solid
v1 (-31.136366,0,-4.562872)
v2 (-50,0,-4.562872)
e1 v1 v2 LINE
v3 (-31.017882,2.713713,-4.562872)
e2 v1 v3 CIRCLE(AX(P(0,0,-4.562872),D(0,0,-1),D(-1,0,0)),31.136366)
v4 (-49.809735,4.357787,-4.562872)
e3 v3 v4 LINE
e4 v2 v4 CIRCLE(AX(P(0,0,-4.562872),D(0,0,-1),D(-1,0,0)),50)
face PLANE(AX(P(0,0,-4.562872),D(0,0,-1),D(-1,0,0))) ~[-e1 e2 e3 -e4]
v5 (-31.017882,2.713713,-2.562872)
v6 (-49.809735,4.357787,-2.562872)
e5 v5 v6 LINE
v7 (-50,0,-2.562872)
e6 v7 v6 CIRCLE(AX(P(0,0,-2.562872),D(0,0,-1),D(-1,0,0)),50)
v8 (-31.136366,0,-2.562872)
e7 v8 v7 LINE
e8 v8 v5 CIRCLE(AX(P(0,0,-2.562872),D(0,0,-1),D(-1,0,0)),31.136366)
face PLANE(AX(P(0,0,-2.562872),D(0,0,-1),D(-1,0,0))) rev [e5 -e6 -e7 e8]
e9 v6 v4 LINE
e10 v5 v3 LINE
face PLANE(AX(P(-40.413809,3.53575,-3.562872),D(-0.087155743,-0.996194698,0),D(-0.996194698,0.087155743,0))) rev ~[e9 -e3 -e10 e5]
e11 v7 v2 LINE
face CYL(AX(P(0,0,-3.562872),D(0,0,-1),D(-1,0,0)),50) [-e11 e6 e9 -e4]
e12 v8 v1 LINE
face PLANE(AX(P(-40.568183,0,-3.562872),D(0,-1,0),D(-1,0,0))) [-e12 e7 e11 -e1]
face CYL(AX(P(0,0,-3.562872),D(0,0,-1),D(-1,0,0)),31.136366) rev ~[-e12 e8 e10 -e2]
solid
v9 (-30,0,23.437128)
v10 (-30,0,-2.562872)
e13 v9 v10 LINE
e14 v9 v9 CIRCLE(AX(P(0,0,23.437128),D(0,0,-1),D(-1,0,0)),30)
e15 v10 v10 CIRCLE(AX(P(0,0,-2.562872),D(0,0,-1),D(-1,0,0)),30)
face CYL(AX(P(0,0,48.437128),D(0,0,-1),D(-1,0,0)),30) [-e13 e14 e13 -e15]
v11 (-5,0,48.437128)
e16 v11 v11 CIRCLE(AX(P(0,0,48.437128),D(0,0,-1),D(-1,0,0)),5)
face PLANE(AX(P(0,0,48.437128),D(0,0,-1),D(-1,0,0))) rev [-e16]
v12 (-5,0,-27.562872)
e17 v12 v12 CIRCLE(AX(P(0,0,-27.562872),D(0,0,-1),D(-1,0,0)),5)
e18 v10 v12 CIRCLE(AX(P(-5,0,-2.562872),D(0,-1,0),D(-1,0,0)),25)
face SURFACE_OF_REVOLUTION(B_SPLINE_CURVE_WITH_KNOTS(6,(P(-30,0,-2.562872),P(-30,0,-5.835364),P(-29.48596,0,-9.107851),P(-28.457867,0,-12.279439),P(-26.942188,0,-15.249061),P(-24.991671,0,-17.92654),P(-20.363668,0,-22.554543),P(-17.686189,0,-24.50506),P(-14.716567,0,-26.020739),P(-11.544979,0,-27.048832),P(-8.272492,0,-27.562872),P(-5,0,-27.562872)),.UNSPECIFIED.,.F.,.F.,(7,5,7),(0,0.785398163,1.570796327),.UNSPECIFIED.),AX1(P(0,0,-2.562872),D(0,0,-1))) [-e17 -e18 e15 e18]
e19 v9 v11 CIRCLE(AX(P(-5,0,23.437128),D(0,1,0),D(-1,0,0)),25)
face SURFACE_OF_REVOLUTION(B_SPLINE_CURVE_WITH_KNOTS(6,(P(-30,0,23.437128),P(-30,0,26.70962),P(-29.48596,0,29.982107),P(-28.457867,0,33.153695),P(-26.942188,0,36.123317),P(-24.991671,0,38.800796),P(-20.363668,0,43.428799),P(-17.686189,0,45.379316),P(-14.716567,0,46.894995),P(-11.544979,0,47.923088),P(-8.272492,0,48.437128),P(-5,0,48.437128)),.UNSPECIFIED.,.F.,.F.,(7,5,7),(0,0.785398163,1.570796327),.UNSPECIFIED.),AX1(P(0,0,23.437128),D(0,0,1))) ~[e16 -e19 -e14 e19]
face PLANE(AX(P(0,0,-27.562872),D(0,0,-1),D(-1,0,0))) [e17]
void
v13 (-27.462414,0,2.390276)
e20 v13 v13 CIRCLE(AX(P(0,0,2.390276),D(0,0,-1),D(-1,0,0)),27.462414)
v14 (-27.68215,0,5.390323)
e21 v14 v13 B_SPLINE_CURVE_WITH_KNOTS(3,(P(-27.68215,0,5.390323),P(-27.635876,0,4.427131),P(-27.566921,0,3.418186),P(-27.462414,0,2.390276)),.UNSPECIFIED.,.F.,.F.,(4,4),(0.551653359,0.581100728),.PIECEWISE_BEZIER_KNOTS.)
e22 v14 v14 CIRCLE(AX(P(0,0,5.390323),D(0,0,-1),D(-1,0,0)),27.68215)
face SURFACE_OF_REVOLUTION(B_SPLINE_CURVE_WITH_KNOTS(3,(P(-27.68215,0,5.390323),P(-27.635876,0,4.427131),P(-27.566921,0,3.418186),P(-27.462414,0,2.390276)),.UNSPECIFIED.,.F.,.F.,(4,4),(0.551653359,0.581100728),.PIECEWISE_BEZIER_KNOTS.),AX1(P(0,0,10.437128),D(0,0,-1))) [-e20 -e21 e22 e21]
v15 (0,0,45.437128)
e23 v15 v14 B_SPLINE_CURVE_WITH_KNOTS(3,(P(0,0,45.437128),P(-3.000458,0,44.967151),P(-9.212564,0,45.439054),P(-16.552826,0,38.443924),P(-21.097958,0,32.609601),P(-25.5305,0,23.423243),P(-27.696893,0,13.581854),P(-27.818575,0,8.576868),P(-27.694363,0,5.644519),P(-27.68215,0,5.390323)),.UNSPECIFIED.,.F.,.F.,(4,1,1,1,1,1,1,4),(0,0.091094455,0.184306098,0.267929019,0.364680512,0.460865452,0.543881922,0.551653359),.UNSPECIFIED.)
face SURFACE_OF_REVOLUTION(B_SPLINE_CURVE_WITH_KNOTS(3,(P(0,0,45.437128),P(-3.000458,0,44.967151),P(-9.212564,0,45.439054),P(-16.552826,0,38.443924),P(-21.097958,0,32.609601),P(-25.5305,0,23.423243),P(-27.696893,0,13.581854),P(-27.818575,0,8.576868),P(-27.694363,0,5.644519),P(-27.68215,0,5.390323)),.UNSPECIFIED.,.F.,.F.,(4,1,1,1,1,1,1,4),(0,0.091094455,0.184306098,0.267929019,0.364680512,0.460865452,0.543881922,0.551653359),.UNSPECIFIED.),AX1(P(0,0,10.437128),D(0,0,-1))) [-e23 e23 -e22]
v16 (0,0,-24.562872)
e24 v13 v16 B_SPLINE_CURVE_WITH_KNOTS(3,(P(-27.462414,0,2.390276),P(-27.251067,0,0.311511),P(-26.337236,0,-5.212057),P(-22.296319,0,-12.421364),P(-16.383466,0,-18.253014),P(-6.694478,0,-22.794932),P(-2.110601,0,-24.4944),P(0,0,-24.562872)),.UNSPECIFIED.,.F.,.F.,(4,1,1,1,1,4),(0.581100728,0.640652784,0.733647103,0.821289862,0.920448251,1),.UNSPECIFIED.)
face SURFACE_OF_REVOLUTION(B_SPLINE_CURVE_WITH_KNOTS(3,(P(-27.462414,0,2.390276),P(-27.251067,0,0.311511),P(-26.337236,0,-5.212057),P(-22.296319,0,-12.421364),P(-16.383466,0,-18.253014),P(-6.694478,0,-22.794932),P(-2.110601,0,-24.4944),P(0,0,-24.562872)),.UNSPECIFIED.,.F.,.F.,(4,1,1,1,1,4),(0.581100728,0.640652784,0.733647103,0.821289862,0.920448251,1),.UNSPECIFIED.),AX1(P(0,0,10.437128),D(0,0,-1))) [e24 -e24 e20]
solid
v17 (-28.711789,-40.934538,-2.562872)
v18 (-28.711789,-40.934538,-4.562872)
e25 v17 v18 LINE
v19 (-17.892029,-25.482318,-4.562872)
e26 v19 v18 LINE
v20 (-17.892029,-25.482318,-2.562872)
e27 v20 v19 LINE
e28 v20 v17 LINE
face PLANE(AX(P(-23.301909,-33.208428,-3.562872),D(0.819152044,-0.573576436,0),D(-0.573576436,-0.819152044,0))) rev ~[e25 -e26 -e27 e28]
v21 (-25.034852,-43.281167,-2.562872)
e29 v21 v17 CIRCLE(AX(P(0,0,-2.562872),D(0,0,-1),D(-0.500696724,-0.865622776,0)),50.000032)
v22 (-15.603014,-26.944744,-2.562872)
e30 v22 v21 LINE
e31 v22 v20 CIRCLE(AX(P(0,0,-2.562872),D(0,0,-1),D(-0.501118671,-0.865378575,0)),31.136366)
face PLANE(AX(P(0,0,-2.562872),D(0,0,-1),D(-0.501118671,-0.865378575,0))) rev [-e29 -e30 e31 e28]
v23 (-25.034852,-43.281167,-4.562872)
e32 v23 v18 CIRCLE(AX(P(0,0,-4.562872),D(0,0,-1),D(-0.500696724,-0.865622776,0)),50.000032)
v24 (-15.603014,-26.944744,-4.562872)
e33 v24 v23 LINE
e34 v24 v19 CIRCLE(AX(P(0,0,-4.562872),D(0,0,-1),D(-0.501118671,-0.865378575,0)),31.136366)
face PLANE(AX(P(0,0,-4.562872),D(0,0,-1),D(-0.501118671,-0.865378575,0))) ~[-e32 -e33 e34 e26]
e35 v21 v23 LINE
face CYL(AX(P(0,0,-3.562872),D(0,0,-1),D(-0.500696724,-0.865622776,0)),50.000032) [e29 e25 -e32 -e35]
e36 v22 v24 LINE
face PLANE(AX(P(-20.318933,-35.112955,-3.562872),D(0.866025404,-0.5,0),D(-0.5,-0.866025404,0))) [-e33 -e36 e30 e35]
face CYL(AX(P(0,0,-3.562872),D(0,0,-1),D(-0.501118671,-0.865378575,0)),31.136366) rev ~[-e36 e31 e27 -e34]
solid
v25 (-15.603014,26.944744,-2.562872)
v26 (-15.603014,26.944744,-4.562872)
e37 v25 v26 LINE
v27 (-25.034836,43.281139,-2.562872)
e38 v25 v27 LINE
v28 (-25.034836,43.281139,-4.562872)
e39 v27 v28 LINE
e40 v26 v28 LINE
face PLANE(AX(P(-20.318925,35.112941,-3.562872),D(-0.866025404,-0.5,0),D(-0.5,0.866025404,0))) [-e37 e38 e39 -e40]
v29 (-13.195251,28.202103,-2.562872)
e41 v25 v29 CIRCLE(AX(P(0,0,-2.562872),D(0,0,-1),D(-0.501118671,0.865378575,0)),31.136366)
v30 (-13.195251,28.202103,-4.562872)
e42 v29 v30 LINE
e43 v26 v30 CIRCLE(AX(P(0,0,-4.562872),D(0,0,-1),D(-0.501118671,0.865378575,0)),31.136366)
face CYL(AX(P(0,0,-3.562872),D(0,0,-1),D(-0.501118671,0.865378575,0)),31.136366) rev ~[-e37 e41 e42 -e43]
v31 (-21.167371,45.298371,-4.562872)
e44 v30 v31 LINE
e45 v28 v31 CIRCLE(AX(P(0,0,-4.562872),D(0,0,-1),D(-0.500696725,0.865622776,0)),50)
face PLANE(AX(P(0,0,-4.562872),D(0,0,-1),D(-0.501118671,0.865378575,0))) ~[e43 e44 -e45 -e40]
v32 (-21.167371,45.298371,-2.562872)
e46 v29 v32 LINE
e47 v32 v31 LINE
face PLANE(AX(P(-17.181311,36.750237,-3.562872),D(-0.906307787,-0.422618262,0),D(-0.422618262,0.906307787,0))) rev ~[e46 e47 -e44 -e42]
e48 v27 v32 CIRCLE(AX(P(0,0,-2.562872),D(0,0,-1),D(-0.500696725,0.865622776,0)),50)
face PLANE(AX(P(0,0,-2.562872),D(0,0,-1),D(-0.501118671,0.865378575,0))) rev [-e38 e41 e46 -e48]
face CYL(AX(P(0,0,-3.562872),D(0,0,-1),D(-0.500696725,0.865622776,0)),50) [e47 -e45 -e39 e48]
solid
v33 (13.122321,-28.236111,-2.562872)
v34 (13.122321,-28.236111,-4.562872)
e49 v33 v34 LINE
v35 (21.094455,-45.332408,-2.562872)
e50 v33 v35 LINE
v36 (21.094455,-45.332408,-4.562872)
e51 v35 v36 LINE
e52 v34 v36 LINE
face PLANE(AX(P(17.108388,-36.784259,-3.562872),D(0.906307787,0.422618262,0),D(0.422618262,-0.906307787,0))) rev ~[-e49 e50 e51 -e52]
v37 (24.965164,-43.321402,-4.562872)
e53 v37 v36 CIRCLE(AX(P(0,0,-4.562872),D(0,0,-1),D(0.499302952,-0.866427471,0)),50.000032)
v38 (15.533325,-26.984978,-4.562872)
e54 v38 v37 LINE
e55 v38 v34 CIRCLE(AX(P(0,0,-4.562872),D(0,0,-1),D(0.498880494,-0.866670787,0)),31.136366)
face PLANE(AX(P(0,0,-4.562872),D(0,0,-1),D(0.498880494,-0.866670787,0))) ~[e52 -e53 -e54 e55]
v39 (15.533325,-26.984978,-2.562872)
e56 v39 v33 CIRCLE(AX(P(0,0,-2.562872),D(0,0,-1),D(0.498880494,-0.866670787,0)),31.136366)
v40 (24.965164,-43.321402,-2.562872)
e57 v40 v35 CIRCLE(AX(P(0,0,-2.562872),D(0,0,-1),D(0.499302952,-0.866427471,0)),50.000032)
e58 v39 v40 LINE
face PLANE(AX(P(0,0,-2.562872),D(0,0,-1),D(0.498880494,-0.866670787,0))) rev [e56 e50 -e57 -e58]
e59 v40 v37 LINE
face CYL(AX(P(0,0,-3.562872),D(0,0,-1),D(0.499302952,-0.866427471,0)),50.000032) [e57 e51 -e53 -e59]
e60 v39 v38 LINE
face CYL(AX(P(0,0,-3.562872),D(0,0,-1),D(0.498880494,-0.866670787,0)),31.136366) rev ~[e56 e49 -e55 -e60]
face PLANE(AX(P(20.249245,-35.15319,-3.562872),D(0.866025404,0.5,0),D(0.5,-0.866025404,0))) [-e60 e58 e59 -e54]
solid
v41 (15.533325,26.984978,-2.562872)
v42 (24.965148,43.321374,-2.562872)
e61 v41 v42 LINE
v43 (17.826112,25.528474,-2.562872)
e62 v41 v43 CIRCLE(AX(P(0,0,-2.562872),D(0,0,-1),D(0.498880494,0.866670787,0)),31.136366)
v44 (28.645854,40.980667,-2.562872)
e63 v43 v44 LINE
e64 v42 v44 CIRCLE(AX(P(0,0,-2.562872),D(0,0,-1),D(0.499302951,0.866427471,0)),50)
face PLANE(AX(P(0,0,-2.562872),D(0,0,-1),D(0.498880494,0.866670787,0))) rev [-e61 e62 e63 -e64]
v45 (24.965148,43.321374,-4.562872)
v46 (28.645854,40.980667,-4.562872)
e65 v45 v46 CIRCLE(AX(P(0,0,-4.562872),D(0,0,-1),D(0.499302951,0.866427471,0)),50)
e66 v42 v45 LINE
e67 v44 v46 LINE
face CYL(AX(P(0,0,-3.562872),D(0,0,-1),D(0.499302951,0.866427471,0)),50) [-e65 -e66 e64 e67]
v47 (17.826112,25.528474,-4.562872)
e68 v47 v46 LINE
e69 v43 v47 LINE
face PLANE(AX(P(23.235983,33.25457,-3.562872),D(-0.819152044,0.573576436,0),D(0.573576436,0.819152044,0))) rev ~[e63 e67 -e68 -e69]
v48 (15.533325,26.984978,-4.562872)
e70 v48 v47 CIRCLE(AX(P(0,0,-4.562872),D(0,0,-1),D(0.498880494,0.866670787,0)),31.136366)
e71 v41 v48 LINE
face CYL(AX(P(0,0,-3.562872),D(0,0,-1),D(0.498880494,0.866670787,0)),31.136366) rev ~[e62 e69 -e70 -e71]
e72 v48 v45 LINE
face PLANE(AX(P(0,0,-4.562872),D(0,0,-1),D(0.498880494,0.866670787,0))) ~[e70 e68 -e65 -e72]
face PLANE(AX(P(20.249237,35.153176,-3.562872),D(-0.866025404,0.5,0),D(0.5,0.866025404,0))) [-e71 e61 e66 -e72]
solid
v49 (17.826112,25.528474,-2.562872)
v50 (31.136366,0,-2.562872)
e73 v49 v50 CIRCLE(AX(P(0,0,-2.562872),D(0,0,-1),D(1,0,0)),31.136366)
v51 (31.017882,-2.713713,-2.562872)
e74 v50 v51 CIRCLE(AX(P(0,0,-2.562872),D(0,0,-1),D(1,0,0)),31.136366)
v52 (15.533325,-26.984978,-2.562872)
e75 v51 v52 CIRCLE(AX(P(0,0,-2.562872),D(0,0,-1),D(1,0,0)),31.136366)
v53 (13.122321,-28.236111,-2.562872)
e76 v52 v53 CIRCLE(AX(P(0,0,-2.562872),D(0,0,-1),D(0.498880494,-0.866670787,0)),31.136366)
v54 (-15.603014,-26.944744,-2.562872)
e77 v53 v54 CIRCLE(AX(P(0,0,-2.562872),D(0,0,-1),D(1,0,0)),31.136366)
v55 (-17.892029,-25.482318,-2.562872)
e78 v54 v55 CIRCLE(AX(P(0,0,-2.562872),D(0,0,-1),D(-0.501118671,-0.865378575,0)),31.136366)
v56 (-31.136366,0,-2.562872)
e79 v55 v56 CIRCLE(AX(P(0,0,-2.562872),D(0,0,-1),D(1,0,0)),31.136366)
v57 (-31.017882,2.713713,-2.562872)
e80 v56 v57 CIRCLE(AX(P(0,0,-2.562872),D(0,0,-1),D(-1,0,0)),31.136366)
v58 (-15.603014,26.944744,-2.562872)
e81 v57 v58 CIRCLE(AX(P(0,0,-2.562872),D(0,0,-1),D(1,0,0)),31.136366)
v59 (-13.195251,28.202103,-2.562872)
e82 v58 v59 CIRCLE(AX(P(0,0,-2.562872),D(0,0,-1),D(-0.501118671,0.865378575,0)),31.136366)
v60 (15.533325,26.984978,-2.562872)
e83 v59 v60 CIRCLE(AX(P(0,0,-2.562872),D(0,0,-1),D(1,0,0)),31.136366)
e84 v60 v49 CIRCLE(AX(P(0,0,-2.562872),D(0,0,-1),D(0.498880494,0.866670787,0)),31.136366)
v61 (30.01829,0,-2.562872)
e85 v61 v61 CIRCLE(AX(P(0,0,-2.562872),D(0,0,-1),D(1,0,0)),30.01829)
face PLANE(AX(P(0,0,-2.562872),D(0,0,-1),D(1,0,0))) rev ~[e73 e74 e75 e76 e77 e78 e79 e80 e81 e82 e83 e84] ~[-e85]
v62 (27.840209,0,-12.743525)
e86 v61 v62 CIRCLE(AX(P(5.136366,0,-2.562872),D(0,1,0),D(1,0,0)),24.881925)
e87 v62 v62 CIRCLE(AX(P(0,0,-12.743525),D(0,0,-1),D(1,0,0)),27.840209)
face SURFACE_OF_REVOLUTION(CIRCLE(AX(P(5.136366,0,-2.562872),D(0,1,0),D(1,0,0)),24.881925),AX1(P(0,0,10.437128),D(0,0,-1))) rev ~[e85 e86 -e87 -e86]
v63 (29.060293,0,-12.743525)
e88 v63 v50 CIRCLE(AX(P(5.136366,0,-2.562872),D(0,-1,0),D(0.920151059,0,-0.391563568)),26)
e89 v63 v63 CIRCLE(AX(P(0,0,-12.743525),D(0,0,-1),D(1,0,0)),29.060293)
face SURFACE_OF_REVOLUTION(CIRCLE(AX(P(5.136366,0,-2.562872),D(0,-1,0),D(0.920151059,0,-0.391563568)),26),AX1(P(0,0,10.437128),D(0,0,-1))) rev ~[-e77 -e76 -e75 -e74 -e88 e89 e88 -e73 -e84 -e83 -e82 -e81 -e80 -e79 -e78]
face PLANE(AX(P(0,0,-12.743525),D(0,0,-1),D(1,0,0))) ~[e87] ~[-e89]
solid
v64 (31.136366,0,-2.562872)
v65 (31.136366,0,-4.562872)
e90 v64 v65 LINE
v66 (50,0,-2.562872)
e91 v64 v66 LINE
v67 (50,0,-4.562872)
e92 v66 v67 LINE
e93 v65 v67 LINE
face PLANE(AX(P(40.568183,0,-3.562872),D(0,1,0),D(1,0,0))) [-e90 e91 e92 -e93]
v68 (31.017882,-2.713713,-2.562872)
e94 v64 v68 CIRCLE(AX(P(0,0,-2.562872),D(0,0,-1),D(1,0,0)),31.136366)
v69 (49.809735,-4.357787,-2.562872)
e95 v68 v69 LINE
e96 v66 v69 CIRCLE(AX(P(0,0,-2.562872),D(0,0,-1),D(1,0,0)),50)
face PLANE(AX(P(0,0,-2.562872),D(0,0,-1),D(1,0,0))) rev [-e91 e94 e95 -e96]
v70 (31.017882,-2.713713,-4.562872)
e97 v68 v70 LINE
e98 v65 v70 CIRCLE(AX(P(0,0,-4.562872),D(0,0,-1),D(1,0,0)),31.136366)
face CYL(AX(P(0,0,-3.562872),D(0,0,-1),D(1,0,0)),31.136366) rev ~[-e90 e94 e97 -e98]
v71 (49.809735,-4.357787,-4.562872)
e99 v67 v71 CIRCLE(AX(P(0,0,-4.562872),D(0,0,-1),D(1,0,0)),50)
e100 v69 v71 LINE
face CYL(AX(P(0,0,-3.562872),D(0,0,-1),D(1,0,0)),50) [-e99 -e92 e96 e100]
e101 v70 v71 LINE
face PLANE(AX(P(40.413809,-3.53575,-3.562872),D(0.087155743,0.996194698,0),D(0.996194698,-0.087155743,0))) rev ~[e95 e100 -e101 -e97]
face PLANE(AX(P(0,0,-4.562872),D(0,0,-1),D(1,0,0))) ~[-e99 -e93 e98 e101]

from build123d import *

# Parameters (mm, degrees)
F2_R     = 25
F3_R     = 25
F7_E36_W = 18.8636766477
F7_E36_H = 2
F7_E35_W = 18.8636344634
F7_E35_H = 2
F7_E38_W = 18.863644271
F7_E38_H = 2
F7_E39_W = 18.863644271
F7_E39_H = 2
F7_E40_W = 18.8636344634
F7_E40_H = 2
F7_E37_W = 18.8636766477
F7_E37_H = 2
F8_ANGLE = 5


with BuildPart() as f1:
    # F0 (on Front) → F1 (revolve)
    with BuildSketch(Plane.XZ):
        with BuildLine():
            add(Edge.make_bspline(
                [(0, 45.4371280968), (-3.0004580163, 44.9671513003), (-9.2125643156, 45.4390536746), (-16.5528259828, 38.4439243544), (-21.0979577111, 32.6096007506), (-25.5305000368, 23.423243266), (-27.6968929758, 13.5818536342), (-27.8185750233, 8.5768682772), (-27.6943626983, 5.6445188447), (-27.6821504659, 5.3903233737)],
                knots=[0, 0, 0, 0, 0.0910944553, 0.1843060983, 0.2679290185, 0.3646805118, 0.4608654522, 0.5438819223, 0.5516533593, 0.5516533593, 0.5516533593, 0.5516533593], degree=3))
            Line((0, 45.4371280968), (0, 48.4371280968))
            Line((0, 48.4371280968), (-30, 48.4371280968))
            Line((-30, 48.4371280968), (-30, 48.2053891704))
            Line((-30, 48.2053891704), (-30, 5.3903233737))
            Line((-30, 5.3903233737), (-27.6821504659, 5.3903233737))
        make_face()
        with BuildLine():
            add(Edge.make_bspline(
                [(-27.6821504659, 5.3903233737), (-27.6358761265, 4.42713114), (-27.5669211006, 3.4181859016), (-27.4624139886, 2.390275872)],
                knots=[0.5516533593, 0.5516533593, 0.5516533593, 0.5516533593, 0.5811007281, 0.5811007281, 0.5811007281, 0.5811007281], degree=3))
            Line((-27.6821504659, 5.3903233737), (-30, 5.3903233737))
            Line((-30, 5.3903233737), (-30, 2.390275872))
            Line((-30, 2.390275872), (-27.4624139886, 2.390275872))
        make_face()
        with BuildLine():
            Line((0, -27.5628719032), (0, -24.5628719032))
            add(Edge.make_bspline(
                [(-27.4624139886, 2.390275872), (-27.2510669776, 0.3115110068), (-26.3372358046, -5.212057084), (-22.2963186711, -12.42136403), (-16.3834656207, -18.253014288), (-6.6944776159, -22.7949319845), (-2.1106013755, -24.494400447), (0, -24.5628719032)],
                knots=[0.5811007281, 0.5811007281, 0.5811007281, 0.5811007281, 0.640652784, 0.7336471032, 0.8212898622, 0.9204482508, 1, 1, 1, 1], degree=3))
            Line((-27.4624139886, 2.390275872), (-30, 2.390275872))
            Line((-30, 2.390275872), (-30, -21.7946108296))
            Line((-30, -21.7946108296), (-30, -27.5628719032))
            Line((-30, -27.5628719032), (0, -27.5628719032))
        make_face()
    revolve(axis=Axis((0, 0, 10.4371280968), (0, 0, -1)))

    # F2
    f2_edges = [f1.edges().sort_by_distance(p)[0] for p in [
        (30, 0, 48.437128),
    ]]
    fillet(f2_edges, radius=F2_R)

    # F3
    f3_edges = [f1.edges().sort_by_distance(p)[0] for p in [
        (-30, 0, -2.062872),
        (30, 0, 23.437128),
        (30, 0, -27.562872),
    ]]
    fillet(f3_edges, radius=F3_R)


with BuildPart() as f5:
    # F4 (on Front) → F5 (revolve)
    with BuildSketch(Plane.XZ):
        with BuildLine():
            ThreePointArc((29.0602930781, -12.7435246812), (30.6120609744, -7.7579601565), (31.1363655366, -2.5628719032))
            Line((31.1363655366, -2.5628719032), (30.0182903195, -2.5628719032))
            ThreePointArc((30.0182903195, -2.5628719032), (29.4676776295, -7.7683913527), (27.8402086015, -12.7435246812))
            Line((27.8402086015, -12.7435246812), (29.0602930781, -12.7435246812))
        make_face()
    revolve(axis=Axis((0, 0, 10.4371280968), (0, 0, -1)))

    # F7_E36 (on explicit) + F7_E35 (on explicit) + F7_E38 (on explicit) + F7_E39 (on explicit) + F7_E40 (on explicit) + F7_E37 (on explicit) → F8 (revolve)
    with BuildSketch(Plane(origin=(15.5333254356, -26.9849784091, -2.5628719032), x_dir=(0.5, -0.8660254038, 0), z_dir=(0.8660254038, 0.5, 0))):
        with Locations((9.4318383239, 1)):
            Rectangle(F7_E36_W, F7_E36_H)
    with BuildSketch(Plane(origin=(31.1363655366, 0, -2.5628719032), x_dir=(1, 0, 0), z_dir=(0, 1, 0))):
        with Locations((9.4318172317, 1)):
            Rectangle(F7_E35_W, F7_E35_H)
    with BuildSketch(Plane(origin=(15.5333254356, 26.9849784091, -2.5628719032), x_dir=(0.5, 0.8660254038, 0), z_dir=(-0.8660254038, 0.5, 0))):
        with Locations((9.4318221355, 1)):
            Rectangle(F7_E38_W, F7_E38_H)
    with BuildSketch(Plane(origin=(-15.6030141051, 26.944743637, -2.5628719032), x_dir=(-0.5, 0.8660254038, 0), z_dir=(-0.8660254038, -0.5, 0))):
        with Locations((9.4318221355, 1)):
            Rectangle(F7_E39_W, F7_E39_H)
    with BuildSketch(Plane(origin=(-31.1363655366, 0, -2.5628719032), x_dir=(-1, 0, 0), z_dir=(0, -1, 0))):
        with Locations((9.4318172317, 1)):
            Rectangle(F7_E40_W, F7_E40_H)
    with BuildSketch(Plane(origin=(-15.6030141051, -26.944743637, -2.5628719032), x_dir=(-0.5, -0.8660254038, 0), z_dir=(0.8660254038, -0.5, 0))):
        with Locations((9.4318383239, 1)):
            Rectangle(F7_E37_W, F7_E37_H)
    revolve(axis=Axis((0, 0, 10.4371280968), (0, 0, -1)), revolution_arc=F8_ANGLE)


solid = Compound([f1.part, f5.part])
